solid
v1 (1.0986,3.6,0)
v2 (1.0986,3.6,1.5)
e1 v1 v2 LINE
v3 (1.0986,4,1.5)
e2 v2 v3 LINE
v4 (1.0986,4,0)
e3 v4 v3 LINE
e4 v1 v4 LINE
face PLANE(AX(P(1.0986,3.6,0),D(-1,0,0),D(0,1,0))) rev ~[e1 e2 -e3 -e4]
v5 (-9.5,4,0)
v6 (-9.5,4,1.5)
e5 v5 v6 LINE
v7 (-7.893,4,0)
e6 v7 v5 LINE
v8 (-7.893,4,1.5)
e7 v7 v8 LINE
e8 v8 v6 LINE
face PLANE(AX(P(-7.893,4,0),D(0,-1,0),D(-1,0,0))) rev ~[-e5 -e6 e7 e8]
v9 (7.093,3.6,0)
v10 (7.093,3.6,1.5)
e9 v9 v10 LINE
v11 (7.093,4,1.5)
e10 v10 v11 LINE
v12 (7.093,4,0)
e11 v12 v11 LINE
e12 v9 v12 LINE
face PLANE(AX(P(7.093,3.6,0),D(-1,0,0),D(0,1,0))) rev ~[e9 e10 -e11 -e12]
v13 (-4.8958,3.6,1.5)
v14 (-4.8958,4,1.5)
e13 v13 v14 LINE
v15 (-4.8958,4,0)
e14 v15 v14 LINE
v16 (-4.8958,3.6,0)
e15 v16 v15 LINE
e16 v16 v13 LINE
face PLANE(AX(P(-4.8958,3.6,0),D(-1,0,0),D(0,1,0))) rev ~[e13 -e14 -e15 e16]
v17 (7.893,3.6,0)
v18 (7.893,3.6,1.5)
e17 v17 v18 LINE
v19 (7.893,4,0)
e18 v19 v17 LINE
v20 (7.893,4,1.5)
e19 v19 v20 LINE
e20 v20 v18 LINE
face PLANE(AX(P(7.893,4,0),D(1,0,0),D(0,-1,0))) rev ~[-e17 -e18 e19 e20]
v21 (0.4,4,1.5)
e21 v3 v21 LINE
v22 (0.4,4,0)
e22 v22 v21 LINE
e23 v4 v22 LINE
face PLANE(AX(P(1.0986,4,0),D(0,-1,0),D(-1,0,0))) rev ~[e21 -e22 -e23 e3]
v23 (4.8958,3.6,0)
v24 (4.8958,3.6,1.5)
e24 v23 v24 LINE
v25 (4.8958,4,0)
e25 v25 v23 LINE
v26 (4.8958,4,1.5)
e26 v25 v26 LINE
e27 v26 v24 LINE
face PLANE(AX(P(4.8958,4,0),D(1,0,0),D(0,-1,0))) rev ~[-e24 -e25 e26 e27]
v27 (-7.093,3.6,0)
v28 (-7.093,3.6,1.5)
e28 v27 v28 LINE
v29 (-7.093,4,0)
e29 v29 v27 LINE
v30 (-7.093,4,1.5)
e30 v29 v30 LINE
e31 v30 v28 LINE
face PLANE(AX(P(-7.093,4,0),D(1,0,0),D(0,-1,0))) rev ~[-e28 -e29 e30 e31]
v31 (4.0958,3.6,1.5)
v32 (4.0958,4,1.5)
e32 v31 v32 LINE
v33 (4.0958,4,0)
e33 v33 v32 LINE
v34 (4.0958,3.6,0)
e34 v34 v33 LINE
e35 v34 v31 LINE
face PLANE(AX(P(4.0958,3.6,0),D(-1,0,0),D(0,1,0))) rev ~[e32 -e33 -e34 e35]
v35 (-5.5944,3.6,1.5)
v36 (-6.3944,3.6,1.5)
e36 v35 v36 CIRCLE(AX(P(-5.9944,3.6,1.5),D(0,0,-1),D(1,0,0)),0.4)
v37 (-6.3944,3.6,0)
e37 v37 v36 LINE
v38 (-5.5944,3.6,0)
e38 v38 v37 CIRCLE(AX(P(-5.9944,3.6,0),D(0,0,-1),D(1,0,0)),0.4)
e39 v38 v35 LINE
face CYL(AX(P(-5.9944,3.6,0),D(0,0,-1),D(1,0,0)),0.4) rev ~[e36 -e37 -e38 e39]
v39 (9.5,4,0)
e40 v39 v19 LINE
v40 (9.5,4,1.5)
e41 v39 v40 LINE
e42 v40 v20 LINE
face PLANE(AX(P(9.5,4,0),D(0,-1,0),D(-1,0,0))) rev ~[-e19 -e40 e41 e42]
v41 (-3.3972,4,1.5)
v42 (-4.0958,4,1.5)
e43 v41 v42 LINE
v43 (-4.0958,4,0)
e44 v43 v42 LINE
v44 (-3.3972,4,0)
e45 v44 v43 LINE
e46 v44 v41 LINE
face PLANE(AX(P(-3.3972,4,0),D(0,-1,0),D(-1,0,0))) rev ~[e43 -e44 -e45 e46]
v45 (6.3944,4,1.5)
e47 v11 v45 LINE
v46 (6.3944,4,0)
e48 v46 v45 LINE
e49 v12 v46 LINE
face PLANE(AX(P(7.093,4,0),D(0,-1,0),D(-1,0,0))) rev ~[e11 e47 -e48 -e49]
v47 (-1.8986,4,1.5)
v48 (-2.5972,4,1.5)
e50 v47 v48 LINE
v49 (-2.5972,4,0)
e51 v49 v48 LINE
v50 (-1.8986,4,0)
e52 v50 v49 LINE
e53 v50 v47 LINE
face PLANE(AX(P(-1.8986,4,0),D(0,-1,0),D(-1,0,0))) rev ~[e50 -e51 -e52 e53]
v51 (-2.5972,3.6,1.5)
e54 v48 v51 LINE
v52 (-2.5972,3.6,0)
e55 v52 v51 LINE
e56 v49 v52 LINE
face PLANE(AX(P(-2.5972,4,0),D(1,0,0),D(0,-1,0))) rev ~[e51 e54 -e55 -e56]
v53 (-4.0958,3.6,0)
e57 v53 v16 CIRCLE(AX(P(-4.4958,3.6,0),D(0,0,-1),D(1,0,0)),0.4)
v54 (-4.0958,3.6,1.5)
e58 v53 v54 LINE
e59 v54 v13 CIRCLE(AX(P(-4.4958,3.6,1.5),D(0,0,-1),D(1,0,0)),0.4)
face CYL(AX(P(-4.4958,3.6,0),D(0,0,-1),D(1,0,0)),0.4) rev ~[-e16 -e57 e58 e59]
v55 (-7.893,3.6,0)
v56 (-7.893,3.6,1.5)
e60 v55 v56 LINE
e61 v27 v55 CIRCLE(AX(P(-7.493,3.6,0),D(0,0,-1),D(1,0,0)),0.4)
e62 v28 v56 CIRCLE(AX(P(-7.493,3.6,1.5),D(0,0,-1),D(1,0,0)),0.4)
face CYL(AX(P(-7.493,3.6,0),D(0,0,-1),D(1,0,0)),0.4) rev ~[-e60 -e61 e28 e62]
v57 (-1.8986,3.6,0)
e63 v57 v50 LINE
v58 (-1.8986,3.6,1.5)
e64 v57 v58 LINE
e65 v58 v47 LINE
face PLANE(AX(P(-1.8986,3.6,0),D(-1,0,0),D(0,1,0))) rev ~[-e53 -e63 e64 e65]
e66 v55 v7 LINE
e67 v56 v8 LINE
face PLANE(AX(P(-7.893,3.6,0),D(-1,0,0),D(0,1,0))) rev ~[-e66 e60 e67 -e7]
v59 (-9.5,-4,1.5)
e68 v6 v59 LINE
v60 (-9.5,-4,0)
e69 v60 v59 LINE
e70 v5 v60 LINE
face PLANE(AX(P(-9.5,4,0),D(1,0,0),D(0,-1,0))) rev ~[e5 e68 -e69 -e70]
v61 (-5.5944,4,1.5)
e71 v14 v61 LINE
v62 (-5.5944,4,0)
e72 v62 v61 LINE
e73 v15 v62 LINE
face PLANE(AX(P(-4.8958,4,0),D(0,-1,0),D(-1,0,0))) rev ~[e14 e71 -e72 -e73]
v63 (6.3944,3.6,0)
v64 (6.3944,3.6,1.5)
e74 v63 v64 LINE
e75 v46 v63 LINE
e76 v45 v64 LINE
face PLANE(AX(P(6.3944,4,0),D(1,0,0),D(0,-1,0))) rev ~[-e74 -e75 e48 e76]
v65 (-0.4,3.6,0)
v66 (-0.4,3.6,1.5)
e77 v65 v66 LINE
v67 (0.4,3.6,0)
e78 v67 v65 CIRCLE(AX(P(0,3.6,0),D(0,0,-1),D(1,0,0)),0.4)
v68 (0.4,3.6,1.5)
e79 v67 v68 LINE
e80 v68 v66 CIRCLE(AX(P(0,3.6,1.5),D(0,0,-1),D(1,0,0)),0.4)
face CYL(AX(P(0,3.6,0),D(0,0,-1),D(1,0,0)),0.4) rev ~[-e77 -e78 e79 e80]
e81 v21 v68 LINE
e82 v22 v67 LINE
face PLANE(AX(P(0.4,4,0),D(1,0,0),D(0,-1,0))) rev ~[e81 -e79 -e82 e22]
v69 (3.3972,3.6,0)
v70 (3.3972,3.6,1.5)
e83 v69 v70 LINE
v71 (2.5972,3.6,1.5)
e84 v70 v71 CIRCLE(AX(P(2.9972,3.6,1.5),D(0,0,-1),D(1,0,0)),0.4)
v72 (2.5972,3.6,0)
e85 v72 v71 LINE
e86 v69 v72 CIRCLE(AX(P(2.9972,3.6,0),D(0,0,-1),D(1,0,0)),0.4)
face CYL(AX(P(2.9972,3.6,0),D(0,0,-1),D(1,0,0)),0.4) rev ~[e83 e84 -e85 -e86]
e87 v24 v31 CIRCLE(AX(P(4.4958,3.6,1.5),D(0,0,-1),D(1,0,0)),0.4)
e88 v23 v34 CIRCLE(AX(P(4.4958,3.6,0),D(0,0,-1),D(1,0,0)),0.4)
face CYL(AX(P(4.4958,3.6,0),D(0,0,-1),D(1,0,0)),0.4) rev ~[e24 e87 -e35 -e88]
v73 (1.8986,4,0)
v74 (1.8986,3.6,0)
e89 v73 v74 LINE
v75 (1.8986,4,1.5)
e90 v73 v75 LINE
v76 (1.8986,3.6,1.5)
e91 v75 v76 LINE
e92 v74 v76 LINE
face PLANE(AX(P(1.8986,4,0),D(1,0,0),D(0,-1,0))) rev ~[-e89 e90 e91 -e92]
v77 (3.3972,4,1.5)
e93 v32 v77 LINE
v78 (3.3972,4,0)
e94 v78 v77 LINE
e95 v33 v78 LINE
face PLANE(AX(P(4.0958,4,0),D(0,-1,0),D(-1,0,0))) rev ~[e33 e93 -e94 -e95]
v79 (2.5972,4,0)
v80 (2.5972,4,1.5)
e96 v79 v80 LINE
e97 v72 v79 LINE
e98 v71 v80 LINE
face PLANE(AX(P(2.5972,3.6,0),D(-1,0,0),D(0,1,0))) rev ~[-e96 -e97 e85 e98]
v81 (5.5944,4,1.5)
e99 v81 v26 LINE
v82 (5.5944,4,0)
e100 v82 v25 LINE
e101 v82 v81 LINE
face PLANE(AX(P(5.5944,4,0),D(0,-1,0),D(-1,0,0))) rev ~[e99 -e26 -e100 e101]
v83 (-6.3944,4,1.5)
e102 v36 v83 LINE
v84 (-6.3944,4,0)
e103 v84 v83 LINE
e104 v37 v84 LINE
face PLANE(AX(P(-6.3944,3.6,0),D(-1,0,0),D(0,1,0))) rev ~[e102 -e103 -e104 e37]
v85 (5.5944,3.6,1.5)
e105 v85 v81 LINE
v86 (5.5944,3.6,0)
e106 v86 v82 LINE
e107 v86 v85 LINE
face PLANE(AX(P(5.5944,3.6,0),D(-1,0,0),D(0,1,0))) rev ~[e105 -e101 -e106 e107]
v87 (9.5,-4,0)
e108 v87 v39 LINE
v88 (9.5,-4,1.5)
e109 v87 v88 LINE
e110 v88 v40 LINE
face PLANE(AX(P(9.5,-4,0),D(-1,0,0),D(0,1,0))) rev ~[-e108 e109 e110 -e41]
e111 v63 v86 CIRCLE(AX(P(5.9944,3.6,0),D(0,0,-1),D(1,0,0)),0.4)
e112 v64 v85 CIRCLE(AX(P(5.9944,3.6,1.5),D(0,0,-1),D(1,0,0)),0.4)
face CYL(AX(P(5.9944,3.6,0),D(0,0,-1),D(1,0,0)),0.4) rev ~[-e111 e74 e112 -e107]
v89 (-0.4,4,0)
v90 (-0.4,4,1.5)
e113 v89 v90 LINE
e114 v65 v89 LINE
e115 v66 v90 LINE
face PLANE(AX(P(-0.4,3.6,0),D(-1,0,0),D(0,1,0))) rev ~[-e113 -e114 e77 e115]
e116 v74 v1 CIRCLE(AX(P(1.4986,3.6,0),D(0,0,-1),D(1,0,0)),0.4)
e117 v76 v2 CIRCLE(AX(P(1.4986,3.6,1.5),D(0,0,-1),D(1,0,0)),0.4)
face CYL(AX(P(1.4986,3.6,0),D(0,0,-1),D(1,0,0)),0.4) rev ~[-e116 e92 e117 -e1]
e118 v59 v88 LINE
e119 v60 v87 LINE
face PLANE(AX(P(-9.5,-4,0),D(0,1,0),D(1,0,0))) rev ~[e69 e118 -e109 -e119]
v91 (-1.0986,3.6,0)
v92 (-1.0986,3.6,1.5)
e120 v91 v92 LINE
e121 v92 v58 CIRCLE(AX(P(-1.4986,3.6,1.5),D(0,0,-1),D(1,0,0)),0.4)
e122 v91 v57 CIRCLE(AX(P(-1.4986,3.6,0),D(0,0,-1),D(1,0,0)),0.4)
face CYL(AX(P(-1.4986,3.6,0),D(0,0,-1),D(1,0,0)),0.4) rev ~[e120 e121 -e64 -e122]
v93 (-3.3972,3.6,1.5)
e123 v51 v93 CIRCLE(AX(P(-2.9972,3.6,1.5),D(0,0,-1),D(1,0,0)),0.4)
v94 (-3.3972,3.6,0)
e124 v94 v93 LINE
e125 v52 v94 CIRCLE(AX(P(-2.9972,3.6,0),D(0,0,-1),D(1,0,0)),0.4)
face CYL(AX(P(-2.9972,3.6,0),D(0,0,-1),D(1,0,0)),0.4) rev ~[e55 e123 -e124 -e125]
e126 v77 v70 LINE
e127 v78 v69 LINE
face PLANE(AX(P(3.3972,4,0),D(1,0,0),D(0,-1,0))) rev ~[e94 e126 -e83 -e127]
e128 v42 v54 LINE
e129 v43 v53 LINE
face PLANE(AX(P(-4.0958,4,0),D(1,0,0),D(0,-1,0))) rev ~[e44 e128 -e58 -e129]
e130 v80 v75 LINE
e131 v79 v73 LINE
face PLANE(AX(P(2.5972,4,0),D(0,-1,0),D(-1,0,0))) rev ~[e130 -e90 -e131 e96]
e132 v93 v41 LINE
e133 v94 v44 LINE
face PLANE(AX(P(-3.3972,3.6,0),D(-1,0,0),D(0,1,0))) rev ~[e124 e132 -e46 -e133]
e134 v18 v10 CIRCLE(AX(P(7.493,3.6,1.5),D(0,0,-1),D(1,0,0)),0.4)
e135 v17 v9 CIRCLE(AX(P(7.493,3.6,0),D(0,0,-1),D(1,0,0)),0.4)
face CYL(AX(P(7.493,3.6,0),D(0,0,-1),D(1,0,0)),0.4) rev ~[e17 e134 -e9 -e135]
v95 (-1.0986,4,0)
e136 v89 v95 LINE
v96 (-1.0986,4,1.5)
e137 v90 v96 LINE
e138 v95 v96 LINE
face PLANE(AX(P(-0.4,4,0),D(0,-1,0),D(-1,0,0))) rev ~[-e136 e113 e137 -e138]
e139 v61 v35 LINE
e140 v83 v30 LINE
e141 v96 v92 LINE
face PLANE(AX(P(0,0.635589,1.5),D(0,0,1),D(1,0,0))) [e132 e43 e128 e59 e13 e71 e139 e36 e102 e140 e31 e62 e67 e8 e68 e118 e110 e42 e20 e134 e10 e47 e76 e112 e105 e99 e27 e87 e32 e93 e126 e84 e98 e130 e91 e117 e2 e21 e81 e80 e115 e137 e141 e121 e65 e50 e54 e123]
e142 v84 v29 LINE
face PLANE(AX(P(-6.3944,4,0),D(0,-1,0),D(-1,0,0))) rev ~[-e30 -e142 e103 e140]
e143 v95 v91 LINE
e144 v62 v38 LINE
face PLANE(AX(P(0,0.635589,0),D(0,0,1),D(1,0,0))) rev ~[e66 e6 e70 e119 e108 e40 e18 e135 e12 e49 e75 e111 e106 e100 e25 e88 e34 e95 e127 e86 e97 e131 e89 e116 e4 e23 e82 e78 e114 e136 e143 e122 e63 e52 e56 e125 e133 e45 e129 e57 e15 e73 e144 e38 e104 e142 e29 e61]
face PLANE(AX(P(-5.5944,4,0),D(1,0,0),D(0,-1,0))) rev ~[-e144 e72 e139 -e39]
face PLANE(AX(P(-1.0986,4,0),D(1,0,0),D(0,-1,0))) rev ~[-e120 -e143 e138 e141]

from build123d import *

# Parameters (mm, degrees)
F1_DEPTH = 1.5


with BuildPart() as f1:
    # F0 (on Top) → F1 (new body)
    with BuildSketch(Plane.XY):
        with BuildLine():
            Line((-7.893, 4), (-9.5, 4))
            Line((-9.5, 4), (-9.5, -4))
            Line((-9.5, -4), (9.5, -4))
            Line((9.5, -4), (9.5, 4))
            Line((9.5, 4), (7.893, 4))
            Line((7.893, 4), (7.893, 3.6))
            ThreePointArc((7.893, 3.6), (7.493, 3.2), (7.093, 3.6))
            Line((7.093, 3.6), (7.093, 4))
            Line((7.093, 4), (6.3944, 4))
            Line((6.3944, 4), (6.3944, 3.6))
            ThreePointArc((6.3944, 3.6), (5.9944, 3.2), (5.5944, 3.6))
            Line((5.5944, 3.6), (5.5944, 4))
            Line((5.5944, 4), (4.8958, 4))
            Line((4.8958, 4), (4.8958, 3.6))
            ThreePointArc((4.8958, 3.6), (4.4958, 3.2), (4.0958, 3.6))
            Line((4.0958, 3.6), (4.0958, 4))
            Line((4.0958, 4), (3.3972, 4))
            Line((3.3972, 4), (3.3972, 3.6))
            ThreePointArc((3.3972, 3.6), (2.9972, 3.2), (2.5972, 3.6))
            Line((2.5972, 3.6), (2.5972, 4))
            Line((2.5972, 4), (1.8986, 4))
            Line((1.8986, 4), (1.8986, 3.6))
            ThreePointArc((1.8986, 3.6), (1.4986, 3.2), (1.0986, 3.6))
            Line((1.0986, 3.6), (1.0986, 4))
            Line((1.0986, 4), (0.4, 4))
            Line((0.4, 4), (0.4, 3.6))
            ThreePointArc((0.4, 3.6), (0, 3.2), (-0.4, 3.6))
            Line((-0.4, 3.6), (-0.4, 4))
            Line((-0.4, 4), (-1.0986, 4))
            Line((-1.0986, 4), (-1.0986, 3.6))
            ThreePointArc((-1.0986, 3.6), (-1.4986, 3.2), (-1.8986, 3.6))
            Line((-1.8986, 3.6), (-1.8986, 4))
            Line((-1.8986, 4), (-2.5972, 4))
            Line((-2.5972, 4), (-2.5972, 3.6))
            ThreePointArc((-2.5972, 3.6), (-2.9972, 3.2), (-3.3972, 3.6))
            Line((-3.3972, 3.6), (-3.3972, 4))
            Line((-3.3972, 4), (-4.0958, 4))
            Line((-4.0958, 4), (-4.0958, 3.6))
            ThreePointArc((-4.0958, 3.6), (-4.4958, 3.2), (-4.8958, 3.6))
            Line((-4.8958, 3.6), (-4.8958, 4))
            Line((-4.8958, 4), (-5.5944, 4))
            Line((-5.5944, 4), (-5.5944, 3.6))
            ThreePointArc((-5.5944, 3.6), (-5.9944, 3.2), (-6.3944, 3.6))
            Line((-6.3944, 3.6), (-6.3944, 4))
            Line((-6.3944, 4), (-7.093, 4))
            Line((-7.093, 4), (-7.093, 3.6))
            ThreePointArc((-7.093, 3.6), (-7.493, 3.2), (-7.893, 3.6))
            Line((-7.893, 3.6), (-7.893, 4))
        make_face()
    extrude(amount=F1_DEPTH)


solid = f1.part
